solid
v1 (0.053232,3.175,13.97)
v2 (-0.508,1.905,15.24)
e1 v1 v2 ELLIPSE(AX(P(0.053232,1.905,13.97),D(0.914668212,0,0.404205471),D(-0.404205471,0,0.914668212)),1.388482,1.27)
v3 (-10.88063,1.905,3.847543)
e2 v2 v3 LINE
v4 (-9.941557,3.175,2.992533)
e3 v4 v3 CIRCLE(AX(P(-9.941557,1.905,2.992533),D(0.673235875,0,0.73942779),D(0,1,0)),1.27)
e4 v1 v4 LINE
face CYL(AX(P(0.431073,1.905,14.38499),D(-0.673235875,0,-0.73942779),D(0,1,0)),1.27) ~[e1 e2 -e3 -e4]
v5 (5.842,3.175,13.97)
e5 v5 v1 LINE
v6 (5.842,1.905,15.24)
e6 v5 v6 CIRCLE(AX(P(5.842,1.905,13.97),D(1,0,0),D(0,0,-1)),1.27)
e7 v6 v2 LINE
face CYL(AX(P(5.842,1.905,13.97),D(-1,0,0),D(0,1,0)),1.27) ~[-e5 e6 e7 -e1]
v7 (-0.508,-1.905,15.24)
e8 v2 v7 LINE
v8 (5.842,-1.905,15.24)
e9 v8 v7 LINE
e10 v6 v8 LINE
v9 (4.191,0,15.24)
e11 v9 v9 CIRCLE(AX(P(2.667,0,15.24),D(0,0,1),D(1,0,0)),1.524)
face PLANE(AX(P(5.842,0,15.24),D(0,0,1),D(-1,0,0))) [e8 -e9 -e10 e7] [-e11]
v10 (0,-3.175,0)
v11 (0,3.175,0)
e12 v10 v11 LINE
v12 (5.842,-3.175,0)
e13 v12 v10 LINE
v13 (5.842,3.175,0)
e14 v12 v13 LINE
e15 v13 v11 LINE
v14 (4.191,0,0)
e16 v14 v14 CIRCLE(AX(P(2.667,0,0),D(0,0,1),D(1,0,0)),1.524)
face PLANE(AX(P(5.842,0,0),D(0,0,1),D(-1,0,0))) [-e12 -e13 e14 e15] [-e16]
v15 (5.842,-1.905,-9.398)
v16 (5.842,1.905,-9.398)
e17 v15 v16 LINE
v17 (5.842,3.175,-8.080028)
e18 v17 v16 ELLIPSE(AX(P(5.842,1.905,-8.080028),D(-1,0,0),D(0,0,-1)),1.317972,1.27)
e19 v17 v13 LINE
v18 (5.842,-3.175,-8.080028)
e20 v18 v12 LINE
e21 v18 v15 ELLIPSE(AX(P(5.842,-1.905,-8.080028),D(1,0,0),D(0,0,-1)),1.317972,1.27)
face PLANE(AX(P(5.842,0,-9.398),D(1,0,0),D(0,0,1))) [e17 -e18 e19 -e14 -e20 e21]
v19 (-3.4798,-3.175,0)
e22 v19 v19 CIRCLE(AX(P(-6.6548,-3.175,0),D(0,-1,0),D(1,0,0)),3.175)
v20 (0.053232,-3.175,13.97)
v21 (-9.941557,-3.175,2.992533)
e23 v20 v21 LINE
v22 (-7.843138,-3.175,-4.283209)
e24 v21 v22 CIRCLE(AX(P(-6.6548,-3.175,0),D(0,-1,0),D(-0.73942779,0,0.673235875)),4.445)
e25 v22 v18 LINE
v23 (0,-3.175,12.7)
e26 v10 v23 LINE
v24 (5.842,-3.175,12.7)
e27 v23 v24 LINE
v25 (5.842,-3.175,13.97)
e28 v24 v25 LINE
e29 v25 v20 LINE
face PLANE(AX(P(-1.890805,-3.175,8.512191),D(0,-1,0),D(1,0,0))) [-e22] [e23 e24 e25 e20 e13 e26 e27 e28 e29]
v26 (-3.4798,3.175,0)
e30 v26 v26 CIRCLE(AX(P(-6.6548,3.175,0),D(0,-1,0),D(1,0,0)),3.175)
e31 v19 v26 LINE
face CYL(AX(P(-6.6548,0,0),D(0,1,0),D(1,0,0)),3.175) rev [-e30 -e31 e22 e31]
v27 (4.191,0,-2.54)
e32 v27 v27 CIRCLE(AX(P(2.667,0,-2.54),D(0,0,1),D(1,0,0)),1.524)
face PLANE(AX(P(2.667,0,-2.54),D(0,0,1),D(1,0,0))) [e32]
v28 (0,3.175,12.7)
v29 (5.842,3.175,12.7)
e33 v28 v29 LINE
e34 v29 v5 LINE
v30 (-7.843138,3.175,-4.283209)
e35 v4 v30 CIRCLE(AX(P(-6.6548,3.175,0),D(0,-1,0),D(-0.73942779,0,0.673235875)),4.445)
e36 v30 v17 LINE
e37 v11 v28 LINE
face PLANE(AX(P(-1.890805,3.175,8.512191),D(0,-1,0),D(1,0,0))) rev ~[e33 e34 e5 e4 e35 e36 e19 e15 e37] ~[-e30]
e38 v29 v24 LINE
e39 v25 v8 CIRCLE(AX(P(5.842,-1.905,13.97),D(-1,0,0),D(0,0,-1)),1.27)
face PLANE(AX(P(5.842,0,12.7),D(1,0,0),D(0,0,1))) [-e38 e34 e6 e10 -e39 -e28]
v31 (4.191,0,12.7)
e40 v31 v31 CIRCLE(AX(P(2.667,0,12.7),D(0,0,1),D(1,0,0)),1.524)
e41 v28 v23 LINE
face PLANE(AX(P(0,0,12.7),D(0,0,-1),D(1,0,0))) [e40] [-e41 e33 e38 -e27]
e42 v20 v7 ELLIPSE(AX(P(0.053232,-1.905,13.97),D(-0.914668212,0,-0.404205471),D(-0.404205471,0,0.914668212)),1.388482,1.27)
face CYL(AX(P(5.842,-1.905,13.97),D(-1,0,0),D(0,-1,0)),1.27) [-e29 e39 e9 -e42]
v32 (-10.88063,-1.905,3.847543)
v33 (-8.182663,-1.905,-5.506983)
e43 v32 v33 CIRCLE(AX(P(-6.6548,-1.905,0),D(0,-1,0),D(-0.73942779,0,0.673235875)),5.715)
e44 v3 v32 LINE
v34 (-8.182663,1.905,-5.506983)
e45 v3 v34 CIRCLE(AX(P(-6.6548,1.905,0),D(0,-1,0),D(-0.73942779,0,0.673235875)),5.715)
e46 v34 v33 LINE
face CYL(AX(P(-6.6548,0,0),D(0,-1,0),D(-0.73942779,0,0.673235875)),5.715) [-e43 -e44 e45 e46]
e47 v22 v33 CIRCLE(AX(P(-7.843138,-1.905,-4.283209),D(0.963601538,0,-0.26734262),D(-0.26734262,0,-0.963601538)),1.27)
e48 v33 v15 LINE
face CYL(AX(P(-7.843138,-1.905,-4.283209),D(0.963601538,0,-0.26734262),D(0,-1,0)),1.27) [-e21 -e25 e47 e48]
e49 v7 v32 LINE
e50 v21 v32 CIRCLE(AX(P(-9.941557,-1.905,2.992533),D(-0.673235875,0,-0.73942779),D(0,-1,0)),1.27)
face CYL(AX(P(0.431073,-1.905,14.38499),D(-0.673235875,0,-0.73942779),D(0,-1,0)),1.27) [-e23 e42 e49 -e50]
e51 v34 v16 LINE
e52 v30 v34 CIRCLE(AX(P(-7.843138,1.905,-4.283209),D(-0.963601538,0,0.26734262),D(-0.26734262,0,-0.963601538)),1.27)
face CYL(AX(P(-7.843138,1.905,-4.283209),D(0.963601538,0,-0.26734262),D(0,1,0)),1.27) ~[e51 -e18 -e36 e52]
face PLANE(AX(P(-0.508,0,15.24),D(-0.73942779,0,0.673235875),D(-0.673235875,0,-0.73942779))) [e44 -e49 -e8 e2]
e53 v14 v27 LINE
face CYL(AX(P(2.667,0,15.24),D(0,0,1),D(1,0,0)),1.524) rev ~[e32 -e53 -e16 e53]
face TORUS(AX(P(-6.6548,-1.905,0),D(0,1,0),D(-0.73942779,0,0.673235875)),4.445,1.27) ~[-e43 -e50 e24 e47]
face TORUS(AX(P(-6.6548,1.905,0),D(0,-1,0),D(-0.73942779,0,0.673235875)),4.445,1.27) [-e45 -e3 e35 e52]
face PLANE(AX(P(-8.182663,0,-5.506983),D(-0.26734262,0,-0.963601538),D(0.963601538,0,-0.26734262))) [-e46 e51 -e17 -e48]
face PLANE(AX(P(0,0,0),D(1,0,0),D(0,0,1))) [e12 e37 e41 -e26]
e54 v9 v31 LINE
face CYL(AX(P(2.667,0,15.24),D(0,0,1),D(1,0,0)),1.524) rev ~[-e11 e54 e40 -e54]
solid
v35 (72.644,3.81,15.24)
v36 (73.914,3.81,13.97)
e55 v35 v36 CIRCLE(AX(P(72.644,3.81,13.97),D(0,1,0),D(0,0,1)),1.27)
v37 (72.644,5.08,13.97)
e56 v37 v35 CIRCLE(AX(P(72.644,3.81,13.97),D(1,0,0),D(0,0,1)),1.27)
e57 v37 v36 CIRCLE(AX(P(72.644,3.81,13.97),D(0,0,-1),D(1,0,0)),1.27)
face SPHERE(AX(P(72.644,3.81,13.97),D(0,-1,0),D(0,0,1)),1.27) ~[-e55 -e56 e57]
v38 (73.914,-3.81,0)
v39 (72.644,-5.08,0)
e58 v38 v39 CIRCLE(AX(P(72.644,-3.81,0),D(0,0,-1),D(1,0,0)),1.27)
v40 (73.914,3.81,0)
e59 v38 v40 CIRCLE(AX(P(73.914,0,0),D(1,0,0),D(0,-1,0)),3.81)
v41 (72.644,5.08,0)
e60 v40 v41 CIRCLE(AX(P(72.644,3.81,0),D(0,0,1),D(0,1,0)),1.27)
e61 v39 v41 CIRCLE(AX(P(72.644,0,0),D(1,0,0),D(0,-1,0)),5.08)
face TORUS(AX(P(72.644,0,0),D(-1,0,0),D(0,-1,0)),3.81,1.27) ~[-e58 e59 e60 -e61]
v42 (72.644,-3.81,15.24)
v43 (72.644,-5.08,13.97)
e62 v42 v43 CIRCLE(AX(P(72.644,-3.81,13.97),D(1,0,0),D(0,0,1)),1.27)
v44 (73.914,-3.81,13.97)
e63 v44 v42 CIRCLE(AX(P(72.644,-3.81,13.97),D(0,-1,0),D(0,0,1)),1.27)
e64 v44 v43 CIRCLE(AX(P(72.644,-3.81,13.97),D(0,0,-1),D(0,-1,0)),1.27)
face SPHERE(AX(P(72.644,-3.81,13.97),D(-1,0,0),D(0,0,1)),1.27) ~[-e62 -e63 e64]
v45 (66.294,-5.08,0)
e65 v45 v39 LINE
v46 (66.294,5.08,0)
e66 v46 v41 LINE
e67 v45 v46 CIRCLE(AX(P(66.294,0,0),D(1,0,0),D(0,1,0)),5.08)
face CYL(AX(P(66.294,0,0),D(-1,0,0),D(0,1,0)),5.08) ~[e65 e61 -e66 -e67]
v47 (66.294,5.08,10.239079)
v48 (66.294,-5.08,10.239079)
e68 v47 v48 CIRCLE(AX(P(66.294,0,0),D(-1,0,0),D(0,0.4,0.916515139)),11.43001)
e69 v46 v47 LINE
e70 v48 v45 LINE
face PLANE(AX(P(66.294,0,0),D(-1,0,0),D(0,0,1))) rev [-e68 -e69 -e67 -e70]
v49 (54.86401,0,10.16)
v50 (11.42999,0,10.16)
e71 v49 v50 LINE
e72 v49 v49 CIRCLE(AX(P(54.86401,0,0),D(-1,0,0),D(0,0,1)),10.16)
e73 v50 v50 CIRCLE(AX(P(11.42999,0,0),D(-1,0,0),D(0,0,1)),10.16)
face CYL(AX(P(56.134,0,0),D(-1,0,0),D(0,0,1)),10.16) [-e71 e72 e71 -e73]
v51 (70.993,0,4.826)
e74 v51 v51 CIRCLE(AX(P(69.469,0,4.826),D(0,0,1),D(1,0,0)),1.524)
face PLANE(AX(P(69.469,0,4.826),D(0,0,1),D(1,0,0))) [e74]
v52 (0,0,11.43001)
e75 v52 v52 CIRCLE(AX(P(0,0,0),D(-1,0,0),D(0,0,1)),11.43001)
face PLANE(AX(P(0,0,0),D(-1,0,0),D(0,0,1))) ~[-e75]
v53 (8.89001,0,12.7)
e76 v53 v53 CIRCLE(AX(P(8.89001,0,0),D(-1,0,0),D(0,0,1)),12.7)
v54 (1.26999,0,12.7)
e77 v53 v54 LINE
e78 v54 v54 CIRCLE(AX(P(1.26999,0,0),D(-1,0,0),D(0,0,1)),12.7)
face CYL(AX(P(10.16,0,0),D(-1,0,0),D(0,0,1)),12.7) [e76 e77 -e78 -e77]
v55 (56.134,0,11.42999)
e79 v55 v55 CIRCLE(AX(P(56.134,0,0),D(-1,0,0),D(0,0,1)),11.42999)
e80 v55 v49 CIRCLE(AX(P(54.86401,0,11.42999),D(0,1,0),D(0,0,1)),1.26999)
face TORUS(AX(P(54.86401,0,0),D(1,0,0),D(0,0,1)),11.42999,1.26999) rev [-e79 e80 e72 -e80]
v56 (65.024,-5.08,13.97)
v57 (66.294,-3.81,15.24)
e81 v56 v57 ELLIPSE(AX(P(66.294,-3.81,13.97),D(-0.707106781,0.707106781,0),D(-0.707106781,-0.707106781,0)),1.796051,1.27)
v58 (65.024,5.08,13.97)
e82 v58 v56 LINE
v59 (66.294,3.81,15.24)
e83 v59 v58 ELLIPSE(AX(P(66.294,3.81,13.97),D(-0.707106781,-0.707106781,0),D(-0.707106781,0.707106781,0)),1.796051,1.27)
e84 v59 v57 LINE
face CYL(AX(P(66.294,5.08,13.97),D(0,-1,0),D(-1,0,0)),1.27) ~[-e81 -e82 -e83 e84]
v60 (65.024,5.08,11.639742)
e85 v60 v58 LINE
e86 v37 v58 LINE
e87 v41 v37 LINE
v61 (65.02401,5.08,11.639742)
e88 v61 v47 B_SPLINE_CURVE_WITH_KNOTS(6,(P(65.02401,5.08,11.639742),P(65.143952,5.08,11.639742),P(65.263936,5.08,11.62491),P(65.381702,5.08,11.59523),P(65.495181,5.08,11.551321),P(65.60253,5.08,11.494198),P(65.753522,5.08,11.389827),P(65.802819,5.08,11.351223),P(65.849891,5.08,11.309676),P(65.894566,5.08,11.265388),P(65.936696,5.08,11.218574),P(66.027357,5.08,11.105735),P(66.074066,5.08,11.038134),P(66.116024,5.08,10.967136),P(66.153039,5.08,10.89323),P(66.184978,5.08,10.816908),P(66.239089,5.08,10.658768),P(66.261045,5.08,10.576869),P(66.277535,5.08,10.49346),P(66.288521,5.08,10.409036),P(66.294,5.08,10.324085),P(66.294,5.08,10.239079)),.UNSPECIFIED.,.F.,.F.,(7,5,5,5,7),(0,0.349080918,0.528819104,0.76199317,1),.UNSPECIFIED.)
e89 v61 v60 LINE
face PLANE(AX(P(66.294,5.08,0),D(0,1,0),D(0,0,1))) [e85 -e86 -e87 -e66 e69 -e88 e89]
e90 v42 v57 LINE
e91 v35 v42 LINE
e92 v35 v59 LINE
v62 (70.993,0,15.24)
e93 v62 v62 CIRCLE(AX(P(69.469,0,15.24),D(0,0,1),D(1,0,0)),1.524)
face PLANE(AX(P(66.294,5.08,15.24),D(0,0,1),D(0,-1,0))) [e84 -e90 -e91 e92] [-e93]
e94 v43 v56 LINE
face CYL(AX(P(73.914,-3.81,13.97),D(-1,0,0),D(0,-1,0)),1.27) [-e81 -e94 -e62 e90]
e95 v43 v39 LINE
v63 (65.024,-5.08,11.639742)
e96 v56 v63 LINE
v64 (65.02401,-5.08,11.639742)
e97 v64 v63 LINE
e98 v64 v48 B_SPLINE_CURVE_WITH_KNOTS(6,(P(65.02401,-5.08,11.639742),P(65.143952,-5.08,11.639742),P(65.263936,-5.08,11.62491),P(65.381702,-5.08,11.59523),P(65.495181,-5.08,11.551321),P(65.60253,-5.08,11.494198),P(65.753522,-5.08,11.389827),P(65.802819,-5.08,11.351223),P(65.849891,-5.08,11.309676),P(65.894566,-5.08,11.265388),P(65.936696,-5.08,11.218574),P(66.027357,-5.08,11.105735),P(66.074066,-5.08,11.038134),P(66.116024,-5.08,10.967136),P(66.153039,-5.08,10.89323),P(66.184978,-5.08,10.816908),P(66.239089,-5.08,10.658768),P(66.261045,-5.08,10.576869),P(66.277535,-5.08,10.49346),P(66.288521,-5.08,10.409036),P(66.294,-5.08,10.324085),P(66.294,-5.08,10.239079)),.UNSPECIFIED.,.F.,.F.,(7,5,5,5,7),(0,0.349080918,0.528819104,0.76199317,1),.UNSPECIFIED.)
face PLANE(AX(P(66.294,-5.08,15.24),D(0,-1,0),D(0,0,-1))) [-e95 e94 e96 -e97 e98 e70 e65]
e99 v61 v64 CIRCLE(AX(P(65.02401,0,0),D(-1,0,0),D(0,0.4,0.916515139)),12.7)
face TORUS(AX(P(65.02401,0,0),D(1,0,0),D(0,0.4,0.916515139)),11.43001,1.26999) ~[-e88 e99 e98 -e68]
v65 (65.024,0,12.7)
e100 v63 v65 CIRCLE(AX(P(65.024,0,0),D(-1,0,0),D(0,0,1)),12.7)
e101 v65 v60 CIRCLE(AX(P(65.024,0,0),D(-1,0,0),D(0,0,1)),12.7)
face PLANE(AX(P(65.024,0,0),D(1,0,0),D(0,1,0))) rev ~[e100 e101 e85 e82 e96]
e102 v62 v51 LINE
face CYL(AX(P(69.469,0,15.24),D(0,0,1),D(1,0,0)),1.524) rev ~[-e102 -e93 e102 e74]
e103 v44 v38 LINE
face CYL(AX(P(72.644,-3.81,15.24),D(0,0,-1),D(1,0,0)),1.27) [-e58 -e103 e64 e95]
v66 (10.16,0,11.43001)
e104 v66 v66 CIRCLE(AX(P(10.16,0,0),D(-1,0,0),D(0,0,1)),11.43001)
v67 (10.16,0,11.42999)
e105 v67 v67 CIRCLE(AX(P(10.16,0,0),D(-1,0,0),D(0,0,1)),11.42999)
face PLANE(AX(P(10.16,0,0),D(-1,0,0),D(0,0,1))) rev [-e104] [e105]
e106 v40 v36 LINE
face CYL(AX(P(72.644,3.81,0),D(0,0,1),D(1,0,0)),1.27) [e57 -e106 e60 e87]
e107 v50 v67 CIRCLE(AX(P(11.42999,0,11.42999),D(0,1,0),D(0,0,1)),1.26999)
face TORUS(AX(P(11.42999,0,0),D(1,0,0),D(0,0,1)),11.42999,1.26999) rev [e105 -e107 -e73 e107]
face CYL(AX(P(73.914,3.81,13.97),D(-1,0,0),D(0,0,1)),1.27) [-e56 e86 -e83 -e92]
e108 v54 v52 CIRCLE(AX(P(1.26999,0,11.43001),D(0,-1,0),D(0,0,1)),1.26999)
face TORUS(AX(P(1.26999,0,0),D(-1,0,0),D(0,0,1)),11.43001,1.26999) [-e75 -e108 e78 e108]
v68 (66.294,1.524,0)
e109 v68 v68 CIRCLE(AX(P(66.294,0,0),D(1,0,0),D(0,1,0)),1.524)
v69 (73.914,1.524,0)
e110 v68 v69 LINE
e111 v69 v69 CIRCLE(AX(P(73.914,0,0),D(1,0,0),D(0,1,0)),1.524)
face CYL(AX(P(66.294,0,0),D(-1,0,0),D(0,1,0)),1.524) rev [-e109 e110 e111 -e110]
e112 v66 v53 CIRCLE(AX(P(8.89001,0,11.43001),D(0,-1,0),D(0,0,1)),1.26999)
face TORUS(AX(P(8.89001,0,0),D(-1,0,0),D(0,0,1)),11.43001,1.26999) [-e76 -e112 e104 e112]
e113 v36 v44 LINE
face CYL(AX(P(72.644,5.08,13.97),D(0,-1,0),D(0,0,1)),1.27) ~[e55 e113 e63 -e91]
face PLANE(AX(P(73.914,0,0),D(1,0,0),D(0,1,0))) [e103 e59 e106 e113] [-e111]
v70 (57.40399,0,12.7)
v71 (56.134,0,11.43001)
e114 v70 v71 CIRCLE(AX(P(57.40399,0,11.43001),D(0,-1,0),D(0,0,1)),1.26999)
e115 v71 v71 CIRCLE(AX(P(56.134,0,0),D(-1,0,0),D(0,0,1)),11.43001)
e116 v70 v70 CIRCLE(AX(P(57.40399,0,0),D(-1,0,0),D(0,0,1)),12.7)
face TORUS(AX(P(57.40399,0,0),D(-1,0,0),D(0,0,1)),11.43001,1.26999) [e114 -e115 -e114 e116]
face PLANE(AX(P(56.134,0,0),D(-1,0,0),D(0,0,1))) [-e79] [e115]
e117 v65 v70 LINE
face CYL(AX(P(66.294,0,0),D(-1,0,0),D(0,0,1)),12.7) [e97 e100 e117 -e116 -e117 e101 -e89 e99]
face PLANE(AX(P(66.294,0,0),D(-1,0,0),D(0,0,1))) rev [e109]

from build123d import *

# Parameters (mm, degrees)
F0_W          = 5.842
F0_H          = 12.7
F0_R          = 3.175
F2_DEPTH      = 3.175
F3_R          = 1.524
F4_DEPTH      = 7.62
F4_DEPTH_BACK = 1.27
F6_R          = 1.524
F7_DEPTH      = 17.78
F5_R          = 1.524
F8_DEPTH      = 10.414
F9_R          = 1.26999
F10_R         = 1.27
F11_R         = 1.27


# Not quite as in the source:
# - a fillet or chamfer is up to 0.001 mm smaller than in the source, because OpenCascade refuses the exact size


with BuildPart() as f1:
    # F0 (on Front) → F1 (revolve)
    with BuildSketch(Plane.XZ):
        with Locations((2.921, 6.35)):
            Rectangle(F0_W, F0_H)
        Polygon((5.842, 12.7), (5.842, 0), (66.294, 0), (66.294, 12.7), (56.134, 12.7), (56.134, 10.16), (10.16, 10.16), (10.16, 12.7), align=None)
    revolve(axis=Axis((33.147, 0, 0), (-1, 0, 0)))

    # F3 (on face) → F4 (join, two sides)
    with BuildSketch(Plane.YZ.offset(66.294)) as f4_sk:
        with BuildLine():
            ThreePointArc((-5.08, 0), (0, -5.08), (5.08, 0))
            ThreePointArc((5.08, 0), (0, 5.08), (-5.08, 0))
        make_face()
        Circle(F3_R, mode=Mode.SUBTRACT)
        with BuildLine():
            ThreePointArc((-5.08, 0), (0, 5.08), (5.08, 0))
            Line((5.08, 0), (5.08, 11.6397422652))
            ThreePointArc((5.08, 11.6397422652), (0, 12.7), (-5.08, 11.6397422652))
            Line((-5.08, 11.6397422652), (-5.08, 0))
        make_face()
        with BuildLine():
            ThreePointArc((-5.08, 11.6397422652), (0, 12.7), (5.08, 11.6397422652))
            Line((5.08, 11.6397422652), (5.08, 15.24))
            Line((5.08, 15.24), (-5.08, 15.24))
            Line((-5.08, 15.24), (-5.08, 11.6397422652))
        make_face()
    extrude(amount=F4_DEPTH)
    extrude(f4_sk.sketch, amount=-F4_DEPTH_BACK)

    # F5 (on face) → F8 (cut)
    with BuildSketch(Plane.XY.offset(15.24)):
        with Locations((69.469, 0)):
            Circle(F5_R)
    extrude(amount=-F8_DEPTH, mode=Mode.SUBTRACT)

    # F9 (radius 1.27 in the source; OpenCascade refuses exactly that, so slightly less here)
    f9_edges = [f1.edges().sort_by_distance(p)[0] for p in [
        (0, 0, -12.7),
        (10.16, 0, -12.7),
        (56.134, 0, -12.7),
        (66.294, 0, -12.7),
        (10.16, 0, -10.16),
        (56.134, 0, -10.16),
    ]]
    fillet(f9_edges, radius=F9_R)

    # F11
    f11_edges = [f1.edges().sort_by_distance(p)[0] for p in [
        (69.469, -5.08, 15.24),
        (73.914, 0, 15.24),
        (69.469, 5.08, 15.24),
        (73.914, 5.08, 7.62),
        (73.914, -5.08, 7.62),
        (65.024, 0, 15.24),
        (73.914, 0, -5.08),
    ]]
    fillet(f11_edges, radius=F11_R)


with BuildPart() as f2:
    # F0 (on Front) → F2 (new body, symmetric)
    with BuildSketch(Plane.XZ):
        with BuildLine():
            Line((-0.9398, 0), (0, 0))
            Line((0, 0), (0, 12.7))
            Line((0, 12.7), (5.842, 12.7))
            Line((5.842, 12.7), (5.842, 15.24))
            Line((5.842, 15.24), (-0.508, 15.24))
            Line((-0.508, 15.24), (-10.8806298187, 3.8475430269))
            ThreePointArc((-10.8806298187, 3.8475430269), (-4.5919612295, 5.3297205562), (-0.9398, 0))
        make_face()
        with BuildLine():
            ThreePointArc((-8.1826630726, -5.5069827884), (-3.1957909266, -4.5493385486), (-0.9398, 0))
            ThreePointArc((-0.9398, 0), (-4.5919612295, 5.3297205562), (-10.8806298187, 3.8475430269))
            ThreePointArc((-10.8806298187, 3.8475430269), (-12.1459778134, -1.5837270034), (-8.1826630726, -5.5069827884))
        make_face()
        with Locations((-6.6548, 0)):
            Circle(F0_R, mode=Mode.SUBTRACT)
        with BuildLine():
            Line((5.842, 0), (0, 0))
            Line((0, 0), (-0.9398, 0))
            ThreePointArc((-0.9398, 0), (-3.1957909266, -4.5493385486), (-8.1826630726, -5.5069827884))
            Line((-8.1826630726, -5.5069827884), (5.842, -9.398))
            Line((5.842, -9.398), (5.842, 0))
        make_face()
    extrude(amount=F2_DEPTH, both=True)

    # F6 (on face) → F7 (cut)
    with BuildSketch(Plane.XY.offset(15.24)):
        with Locations((2.667, 0)):
            Circle(F6_R)
    extrude(amount=-F7_DEPTH, mode=Mode.SUBTRACT)

    # F10
    f10_edges = [f2.edges().sort_by_distance(p)[0] for p in [
        (2.667, -3.175, 15.24),
        (-5.694315, -3.175, 9.543772),
        (2.667, 3.175, 15.24),
        (-5.694315, 3.175, 9.543772),
        (-12.145978, 3.175, -1.583727),
    ]]
    fillet(f10_edges, radius=F10_R)


solid = Compound([f1.part, f2.part])
